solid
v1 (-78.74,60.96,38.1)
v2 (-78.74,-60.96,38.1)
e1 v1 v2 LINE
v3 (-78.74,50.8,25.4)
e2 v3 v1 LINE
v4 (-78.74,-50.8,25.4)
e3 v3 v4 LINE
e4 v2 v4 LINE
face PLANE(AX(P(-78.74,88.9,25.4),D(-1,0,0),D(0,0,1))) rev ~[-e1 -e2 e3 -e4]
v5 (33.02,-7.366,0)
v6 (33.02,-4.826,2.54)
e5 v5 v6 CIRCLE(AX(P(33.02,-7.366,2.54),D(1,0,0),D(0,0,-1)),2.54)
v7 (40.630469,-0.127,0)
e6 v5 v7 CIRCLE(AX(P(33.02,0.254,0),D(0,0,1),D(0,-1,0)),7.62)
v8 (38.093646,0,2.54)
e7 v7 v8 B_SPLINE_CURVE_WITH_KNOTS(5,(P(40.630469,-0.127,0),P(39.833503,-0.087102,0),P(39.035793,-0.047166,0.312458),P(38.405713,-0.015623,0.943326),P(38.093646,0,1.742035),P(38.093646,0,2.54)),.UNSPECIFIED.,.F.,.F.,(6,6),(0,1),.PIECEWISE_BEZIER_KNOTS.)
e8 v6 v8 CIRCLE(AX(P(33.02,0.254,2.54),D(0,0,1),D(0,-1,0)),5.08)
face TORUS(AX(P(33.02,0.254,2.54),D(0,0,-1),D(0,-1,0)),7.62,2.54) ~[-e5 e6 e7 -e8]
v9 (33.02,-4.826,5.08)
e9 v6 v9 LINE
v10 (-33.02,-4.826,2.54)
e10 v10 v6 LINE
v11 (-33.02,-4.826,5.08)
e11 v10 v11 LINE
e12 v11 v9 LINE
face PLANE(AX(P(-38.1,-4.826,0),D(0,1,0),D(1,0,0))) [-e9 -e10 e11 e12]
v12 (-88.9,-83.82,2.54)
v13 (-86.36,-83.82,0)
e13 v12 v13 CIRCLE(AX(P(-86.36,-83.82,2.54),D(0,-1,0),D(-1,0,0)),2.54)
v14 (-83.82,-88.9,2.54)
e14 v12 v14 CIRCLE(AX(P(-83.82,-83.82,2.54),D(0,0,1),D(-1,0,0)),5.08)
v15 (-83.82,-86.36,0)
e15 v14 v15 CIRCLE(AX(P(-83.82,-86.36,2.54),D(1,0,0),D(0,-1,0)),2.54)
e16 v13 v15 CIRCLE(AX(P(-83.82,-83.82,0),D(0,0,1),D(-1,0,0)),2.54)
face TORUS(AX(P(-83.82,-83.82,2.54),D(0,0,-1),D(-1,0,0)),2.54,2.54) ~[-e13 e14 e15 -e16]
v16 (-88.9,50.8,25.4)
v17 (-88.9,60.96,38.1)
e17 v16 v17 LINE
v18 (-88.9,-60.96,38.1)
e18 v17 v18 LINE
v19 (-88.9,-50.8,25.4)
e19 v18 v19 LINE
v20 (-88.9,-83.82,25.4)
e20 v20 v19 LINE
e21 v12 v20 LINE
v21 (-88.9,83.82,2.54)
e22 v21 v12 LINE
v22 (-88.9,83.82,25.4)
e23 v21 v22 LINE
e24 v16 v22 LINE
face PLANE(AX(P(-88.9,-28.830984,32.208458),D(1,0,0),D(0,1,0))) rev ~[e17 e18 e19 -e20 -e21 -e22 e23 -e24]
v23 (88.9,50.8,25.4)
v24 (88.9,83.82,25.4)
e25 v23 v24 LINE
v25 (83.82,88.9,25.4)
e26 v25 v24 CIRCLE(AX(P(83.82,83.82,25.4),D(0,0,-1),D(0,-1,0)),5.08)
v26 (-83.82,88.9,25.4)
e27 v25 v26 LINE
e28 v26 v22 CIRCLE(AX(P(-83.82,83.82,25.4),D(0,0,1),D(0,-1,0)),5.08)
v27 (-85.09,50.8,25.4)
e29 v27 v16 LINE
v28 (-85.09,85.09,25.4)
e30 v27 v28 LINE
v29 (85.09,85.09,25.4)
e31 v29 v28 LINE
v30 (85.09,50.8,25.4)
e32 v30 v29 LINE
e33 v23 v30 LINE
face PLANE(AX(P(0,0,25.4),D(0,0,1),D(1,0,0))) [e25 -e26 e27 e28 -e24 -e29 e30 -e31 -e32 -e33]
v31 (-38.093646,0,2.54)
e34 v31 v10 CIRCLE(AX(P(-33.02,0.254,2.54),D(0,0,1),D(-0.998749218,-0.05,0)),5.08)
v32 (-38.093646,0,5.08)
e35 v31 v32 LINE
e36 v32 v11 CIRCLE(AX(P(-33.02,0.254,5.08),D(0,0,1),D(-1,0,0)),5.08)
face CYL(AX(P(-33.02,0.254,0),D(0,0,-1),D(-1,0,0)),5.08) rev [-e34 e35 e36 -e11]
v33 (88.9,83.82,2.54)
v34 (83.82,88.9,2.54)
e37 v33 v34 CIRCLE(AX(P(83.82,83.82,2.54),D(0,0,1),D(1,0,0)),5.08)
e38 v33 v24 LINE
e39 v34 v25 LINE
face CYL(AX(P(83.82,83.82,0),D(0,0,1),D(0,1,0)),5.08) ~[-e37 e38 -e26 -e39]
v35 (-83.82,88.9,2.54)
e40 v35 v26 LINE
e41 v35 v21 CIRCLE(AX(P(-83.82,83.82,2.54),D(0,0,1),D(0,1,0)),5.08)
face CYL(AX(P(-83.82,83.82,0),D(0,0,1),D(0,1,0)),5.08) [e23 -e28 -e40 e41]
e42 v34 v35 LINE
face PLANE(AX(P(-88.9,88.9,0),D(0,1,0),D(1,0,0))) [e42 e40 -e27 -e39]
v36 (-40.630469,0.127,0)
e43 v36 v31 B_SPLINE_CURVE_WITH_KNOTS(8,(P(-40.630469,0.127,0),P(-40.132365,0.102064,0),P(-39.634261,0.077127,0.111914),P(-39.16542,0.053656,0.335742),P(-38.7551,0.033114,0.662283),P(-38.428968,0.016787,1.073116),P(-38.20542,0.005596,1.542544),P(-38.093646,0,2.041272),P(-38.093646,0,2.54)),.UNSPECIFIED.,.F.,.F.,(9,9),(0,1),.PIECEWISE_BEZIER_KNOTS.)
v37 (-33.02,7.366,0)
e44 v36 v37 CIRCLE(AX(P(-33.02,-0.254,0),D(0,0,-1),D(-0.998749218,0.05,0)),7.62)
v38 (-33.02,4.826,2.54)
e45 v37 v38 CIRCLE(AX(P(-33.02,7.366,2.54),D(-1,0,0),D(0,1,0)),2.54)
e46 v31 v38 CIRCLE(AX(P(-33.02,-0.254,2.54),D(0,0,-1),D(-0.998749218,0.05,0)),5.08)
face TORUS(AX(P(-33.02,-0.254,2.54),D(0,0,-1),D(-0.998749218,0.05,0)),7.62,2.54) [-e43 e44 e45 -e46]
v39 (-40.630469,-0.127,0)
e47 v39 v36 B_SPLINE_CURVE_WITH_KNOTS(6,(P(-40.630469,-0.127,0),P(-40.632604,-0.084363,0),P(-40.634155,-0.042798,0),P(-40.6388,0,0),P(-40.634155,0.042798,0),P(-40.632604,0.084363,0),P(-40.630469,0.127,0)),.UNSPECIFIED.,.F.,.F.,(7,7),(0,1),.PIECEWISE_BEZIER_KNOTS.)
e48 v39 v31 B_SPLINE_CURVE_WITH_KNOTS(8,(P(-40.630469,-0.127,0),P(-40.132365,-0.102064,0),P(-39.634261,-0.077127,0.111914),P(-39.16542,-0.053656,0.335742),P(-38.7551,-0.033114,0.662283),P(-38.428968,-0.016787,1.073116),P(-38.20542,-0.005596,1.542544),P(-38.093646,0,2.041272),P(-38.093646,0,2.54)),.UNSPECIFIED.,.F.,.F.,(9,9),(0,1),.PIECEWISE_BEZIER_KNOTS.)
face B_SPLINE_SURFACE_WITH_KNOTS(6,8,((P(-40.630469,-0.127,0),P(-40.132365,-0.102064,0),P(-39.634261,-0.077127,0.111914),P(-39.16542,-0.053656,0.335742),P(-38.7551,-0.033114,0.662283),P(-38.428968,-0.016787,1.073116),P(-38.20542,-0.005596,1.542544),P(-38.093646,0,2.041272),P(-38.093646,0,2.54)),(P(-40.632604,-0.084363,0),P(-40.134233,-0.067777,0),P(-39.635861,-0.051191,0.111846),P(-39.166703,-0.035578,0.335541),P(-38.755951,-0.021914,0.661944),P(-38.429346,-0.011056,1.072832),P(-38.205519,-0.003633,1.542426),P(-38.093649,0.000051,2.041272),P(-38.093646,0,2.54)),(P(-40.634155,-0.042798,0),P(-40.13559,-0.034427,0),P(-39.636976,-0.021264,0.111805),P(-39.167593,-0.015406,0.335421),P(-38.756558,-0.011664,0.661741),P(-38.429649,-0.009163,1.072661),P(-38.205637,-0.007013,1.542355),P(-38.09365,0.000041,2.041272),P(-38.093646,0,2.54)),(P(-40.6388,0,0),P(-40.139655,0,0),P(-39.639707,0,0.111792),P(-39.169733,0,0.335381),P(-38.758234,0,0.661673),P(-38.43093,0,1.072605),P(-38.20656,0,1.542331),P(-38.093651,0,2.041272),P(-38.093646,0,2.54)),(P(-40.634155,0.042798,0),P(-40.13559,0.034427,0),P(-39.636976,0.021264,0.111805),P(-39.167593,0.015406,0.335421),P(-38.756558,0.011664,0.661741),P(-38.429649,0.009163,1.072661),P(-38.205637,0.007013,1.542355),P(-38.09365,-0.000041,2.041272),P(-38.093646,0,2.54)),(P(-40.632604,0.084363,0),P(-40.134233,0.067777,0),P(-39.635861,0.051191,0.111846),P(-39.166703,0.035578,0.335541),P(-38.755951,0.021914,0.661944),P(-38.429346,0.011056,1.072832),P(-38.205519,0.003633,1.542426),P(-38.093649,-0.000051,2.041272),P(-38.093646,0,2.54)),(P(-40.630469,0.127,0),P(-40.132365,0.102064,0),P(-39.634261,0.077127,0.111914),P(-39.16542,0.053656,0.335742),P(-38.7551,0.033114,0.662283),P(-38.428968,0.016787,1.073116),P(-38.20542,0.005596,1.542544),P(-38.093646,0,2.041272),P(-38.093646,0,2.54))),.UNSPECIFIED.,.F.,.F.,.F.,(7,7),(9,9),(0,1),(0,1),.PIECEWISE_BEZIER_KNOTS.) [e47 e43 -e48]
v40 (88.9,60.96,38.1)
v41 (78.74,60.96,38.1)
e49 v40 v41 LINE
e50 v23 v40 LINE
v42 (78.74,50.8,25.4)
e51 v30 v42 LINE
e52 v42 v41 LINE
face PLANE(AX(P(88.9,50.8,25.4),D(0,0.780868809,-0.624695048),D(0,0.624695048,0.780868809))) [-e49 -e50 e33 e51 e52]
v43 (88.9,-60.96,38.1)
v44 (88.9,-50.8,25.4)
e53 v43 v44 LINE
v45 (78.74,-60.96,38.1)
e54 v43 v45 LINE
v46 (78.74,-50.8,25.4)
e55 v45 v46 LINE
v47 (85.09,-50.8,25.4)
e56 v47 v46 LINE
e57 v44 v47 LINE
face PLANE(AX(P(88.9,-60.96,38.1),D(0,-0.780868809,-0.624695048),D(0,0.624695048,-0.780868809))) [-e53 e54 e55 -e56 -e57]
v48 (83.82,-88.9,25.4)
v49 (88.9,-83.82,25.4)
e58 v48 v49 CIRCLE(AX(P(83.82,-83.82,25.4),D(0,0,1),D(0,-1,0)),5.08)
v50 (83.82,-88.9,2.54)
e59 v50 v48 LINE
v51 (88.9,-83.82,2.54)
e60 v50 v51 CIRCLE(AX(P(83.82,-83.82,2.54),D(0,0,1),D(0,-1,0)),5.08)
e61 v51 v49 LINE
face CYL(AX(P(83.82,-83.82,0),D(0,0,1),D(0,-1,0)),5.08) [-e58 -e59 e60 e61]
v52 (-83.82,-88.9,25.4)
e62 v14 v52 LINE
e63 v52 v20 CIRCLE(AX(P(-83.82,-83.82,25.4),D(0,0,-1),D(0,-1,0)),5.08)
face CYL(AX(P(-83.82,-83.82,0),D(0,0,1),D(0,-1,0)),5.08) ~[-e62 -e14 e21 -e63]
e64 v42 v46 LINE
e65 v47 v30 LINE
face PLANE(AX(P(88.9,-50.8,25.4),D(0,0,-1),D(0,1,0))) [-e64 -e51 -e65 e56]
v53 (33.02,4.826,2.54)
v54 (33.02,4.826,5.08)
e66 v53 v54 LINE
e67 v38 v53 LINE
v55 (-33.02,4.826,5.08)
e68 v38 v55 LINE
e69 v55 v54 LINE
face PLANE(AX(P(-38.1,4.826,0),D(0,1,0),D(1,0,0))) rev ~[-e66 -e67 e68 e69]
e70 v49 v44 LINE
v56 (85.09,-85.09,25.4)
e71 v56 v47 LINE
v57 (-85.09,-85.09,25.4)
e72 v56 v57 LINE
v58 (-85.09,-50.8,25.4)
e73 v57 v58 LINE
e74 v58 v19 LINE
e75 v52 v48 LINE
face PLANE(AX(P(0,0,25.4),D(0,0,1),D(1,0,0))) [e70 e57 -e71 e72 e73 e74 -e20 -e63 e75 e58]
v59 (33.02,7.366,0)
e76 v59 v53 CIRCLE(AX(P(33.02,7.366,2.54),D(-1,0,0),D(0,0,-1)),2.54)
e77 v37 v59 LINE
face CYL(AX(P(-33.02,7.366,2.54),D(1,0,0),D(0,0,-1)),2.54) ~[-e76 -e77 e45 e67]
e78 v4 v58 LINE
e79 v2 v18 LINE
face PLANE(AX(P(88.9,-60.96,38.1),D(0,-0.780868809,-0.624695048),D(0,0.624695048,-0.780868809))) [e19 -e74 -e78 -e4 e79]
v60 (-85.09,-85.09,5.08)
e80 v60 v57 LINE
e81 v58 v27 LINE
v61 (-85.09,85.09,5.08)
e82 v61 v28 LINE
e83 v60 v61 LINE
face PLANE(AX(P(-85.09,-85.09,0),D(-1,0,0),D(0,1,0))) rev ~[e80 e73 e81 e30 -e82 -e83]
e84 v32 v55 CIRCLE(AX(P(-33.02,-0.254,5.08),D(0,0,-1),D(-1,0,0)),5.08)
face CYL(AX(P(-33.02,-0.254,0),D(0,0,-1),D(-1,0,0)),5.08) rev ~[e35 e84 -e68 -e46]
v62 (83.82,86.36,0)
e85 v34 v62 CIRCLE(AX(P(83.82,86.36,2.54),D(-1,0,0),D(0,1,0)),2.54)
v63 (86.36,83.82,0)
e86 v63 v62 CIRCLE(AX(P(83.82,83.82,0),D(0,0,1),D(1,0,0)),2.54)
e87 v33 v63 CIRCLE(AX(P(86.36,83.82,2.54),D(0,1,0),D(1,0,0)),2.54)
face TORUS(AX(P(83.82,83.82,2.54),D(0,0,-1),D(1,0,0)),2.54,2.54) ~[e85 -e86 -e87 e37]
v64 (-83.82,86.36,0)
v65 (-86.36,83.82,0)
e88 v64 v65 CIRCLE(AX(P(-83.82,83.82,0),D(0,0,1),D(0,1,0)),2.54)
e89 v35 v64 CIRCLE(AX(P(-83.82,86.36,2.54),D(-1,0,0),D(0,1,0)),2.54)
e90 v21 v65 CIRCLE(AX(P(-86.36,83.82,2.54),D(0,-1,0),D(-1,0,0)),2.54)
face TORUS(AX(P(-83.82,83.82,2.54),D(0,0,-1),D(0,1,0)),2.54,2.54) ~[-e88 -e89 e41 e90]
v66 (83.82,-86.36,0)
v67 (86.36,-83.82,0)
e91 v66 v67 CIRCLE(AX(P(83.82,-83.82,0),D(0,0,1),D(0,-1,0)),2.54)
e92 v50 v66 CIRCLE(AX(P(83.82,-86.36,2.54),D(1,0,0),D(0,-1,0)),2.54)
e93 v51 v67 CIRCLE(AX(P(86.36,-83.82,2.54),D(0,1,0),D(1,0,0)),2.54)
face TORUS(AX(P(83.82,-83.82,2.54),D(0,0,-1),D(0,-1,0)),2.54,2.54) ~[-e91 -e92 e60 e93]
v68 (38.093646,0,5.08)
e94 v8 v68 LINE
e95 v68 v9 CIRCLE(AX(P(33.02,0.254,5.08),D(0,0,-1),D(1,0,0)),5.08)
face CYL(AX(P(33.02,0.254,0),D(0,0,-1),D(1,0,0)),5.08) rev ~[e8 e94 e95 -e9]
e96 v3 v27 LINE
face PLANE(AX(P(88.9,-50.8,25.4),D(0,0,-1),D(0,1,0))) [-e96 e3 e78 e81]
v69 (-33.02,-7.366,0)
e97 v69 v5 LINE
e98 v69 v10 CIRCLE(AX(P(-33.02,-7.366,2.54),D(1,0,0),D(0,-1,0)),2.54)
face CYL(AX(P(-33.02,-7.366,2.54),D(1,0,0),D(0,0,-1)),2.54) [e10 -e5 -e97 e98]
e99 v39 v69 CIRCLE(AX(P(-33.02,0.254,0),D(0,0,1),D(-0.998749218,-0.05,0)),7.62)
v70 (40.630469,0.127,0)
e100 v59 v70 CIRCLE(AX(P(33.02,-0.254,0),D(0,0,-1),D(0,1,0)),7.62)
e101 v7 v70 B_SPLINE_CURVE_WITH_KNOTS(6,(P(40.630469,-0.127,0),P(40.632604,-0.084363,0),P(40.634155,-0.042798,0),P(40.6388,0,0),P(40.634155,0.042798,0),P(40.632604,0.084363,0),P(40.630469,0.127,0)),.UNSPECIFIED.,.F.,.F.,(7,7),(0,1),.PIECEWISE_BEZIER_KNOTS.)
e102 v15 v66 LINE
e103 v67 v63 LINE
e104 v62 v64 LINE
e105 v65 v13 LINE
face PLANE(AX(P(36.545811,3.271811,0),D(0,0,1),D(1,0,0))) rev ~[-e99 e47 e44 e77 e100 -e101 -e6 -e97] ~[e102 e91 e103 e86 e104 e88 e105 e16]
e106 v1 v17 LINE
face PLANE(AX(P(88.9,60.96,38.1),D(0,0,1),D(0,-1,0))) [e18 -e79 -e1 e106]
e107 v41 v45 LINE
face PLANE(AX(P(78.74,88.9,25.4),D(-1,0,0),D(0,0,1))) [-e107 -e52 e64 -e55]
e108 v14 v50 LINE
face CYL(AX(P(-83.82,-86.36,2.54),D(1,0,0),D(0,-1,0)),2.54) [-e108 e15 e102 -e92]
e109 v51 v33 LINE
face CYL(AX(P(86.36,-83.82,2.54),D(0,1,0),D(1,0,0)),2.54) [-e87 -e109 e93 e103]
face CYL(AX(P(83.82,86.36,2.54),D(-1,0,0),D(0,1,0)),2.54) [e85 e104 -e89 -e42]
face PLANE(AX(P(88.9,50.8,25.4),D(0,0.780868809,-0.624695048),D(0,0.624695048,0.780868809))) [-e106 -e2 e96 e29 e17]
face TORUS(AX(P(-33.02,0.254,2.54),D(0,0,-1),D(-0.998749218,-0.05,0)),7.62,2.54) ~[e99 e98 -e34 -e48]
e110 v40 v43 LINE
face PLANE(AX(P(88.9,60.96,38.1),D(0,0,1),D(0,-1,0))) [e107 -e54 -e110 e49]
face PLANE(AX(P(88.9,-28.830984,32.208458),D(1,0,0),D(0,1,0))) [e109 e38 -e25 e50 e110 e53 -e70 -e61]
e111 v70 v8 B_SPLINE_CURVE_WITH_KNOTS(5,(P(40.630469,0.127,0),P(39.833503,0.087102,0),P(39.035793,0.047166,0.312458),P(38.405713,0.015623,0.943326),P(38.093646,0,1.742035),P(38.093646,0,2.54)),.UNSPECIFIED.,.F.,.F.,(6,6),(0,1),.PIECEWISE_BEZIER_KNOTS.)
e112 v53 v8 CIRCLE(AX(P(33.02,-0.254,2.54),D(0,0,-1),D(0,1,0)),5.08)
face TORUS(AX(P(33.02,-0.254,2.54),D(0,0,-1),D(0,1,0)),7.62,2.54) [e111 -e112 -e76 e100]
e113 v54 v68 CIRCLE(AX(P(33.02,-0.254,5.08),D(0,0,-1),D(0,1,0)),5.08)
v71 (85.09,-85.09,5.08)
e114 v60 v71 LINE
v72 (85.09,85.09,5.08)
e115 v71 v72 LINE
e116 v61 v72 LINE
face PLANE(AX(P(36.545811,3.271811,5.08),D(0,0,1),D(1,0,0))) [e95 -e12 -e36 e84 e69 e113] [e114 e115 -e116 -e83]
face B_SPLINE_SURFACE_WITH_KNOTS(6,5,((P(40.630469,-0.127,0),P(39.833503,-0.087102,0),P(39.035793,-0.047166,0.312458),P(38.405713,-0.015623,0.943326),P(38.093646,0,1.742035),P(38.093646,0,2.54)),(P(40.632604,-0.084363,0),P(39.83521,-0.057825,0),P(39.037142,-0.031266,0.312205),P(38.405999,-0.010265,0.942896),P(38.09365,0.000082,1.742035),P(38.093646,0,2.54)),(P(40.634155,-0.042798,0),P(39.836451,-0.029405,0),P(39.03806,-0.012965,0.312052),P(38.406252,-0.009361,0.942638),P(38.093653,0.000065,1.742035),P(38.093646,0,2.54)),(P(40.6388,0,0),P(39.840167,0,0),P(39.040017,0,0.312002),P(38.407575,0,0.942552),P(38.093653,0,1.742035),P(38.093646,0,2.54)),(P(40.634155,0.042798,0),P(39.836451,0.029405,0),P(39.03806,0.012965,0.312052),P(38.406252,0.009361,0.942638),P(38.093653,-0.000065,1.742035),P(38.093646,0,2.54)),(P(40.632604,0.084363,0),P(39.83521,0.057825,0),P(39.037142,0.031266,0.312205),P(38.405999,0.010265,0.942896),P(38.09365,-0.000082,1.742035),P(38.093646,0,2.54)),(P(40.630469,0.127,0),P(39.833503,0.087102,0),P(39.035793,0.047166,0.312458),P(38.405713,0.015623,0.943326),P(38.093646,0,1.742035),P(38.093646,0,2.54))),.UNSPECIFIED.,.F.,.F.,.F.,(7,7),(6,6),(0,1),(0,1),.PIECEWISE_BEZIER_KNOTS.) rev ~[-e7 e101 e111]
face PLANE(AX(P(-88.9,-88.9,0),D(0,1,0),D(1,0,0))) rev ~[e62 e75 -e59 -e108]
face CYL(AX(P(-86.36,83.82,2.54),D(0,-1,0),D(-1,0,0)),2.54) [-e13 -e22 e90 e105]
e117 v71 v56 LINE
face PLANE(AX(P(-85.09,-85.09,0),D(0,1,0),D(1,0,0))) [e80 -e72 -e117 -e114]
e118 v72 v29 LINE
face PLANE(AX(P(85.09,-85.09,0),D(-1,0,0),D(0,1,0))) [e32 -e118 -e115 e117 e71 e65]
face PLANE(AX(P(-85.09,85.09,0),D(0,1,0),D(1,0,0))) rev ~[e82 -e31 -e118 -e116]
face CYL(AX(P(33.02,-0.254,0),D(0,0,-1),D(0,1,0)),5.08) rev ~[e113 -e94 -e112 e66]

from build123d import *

# Parameters (mm, degrees)
F0_W        = 177.8
F0_H        = 177.8
F0_W_2      = 170.18
F0_H_2      = 170.18
F1_DEPTH    = 25.4
F0_W_3      = 76.2
F0_H_3      = 9.652
F2_DEPTH    = 5.08
F3_T1_DEPTH = 5.08
F5_DEPTH    = 177.8
F6_W        = 78.74
F6_H        = 15.522254324
F7_DEPTH    = 177.801
F8_R        = 5.08
F9_R        = 2.54


# Not quite as in the source:
# - a fillet or chamfer that OpenCascade refuses, or shapes differently, is made with other operations: its cross-section is extruded or revolved along the edge and cut away or added


with BuildPart() as f1:
    # F0 (on Top) → F1 (new body)
    with BuildSketch(Plane.XY):
        Rectangle(F0_W, F0_H)
        Rectangle(F0_W_2, F0_H_2, mode=Mode.SUBTRACT)
    extrude(amount=F1_DEPTH)

    # F0 (on Top) → F2 (join)
    with BuildSketch(Plane.XY):
        Rectangle(F0_W_2, F0_H_2)
        Rectangle(F0_W_3, F0_H_3, mode=Mode.SUBTRACT)
    extrude(amount=F2_DEPTH)

    # F3: fillet of radius 5.08 on 4 edges, made by hand

    # F3_s2 → F3_t1 (join)
    with BuildSketch(Plane.XY):
        with BuildLine():
            ThreePointArc((33.02, 4.826), (36.6121024484, 3.3381024484), (38.1, -0.254))
            Line((38.1, -0.254), (38.1, 4.826))
            Line((38.1, 4.826), (33.02, 4.826))
        make_face()
        with BuildLine():
            ThreePointArc((38.1, 0.254), (36.6121024484, -3.3381024484), (33.02, -4.826))
            Line((33.02, -4.826), (38.1, -4.826))
            Line((38.1, -4.826), (38.1, 0.254))
        make_face()
        with BuildLine():
            ThreePointArc((-38.1, -0.254), (-36.6121024484, 3.3381024484), (-33.02, 4.826))
            Line((-33.02, 4.826), (-38.1, 4.826))
            Line((-38.1, 4.826), (-38.1, -0.254))
        make_face()
        with BuildLine():
            ThreePointArc((-38.1, 0.254), (-36.6121024484, -3.3381024484), (-33.02, -4.826))
            Line((-33.02, -4.826), (-38.1, -4.826))
            Line((-38.1, -4.826), (-38.1, 0.254))
        make_face()
    extrude(amount=F3_T1_DEPTH)

    # F4 (on face) → F5 (join, through all)
    with BuildSketch(Plane.YZ.offset(88.9)):
        Polygon((-50.8, 25.4), (0, 25.4), (0, 38.1), (-60.96, 38.1), align=None)
        Polygon((0, 38.1), (0, 25.4), (50.8, 25.4), (60.96, 38.1), align=None)
    extrude(amount=-F5_DEPTH)

    # F6 (on face) → F7 (cut, through all)
    with BuildSketch(Plane(origin=(0, 88.9, 0), x_dir=(-1, 0, 0), z_dir=(0, 1, 0))):
        with Locations((-39.37, 33.161127162)):
            Rectangle(F6_W, F6_H)
        with Locations((39.37, 33.161127162)):
            Rectangle(F6_W, F6_H)
    extrude(amount=-F7_DEPTH, mode=Mode.SUBTRACT)

    # F8
    f8_edges = [f1.edges().sort_by_distance(p)[0] for p in [
        (88.9, -88.9, 12.7),
        (88.9, 88.9, 12.7),
        (-88.9, 88.9, 12.7),
        (-88.9, -88.9, 12.7),
    ]]
    fillet(f8_edges, radius=F8_R)

    # F9
    f9_edges = [f1.edges().sort_by_distance(p)[0] for p in [
        (88.9, 0, 0),
        (0, 88.9, 0),
        (87.412102, -87.412102, 0),
        (87.412102, 87.412102, 0),
        (0, -88.9, 0),
        (-87.412102, -87.412102, 0),
        (-87.412102, 87.412102, 0),
        (-88.9, 0, 0),
        (0, -4.826, 0),
        (-36.521148, -3.42681, 0),
        (-36.521148, 3.42681, 0),
        (0, 4.826, 0),
        (36.521148, 3.42681, 0),
        (36.521148, -3.42681, 0),
    ]]
    fillet(f9_edges, radius=F9_R)


solid = f1.part
